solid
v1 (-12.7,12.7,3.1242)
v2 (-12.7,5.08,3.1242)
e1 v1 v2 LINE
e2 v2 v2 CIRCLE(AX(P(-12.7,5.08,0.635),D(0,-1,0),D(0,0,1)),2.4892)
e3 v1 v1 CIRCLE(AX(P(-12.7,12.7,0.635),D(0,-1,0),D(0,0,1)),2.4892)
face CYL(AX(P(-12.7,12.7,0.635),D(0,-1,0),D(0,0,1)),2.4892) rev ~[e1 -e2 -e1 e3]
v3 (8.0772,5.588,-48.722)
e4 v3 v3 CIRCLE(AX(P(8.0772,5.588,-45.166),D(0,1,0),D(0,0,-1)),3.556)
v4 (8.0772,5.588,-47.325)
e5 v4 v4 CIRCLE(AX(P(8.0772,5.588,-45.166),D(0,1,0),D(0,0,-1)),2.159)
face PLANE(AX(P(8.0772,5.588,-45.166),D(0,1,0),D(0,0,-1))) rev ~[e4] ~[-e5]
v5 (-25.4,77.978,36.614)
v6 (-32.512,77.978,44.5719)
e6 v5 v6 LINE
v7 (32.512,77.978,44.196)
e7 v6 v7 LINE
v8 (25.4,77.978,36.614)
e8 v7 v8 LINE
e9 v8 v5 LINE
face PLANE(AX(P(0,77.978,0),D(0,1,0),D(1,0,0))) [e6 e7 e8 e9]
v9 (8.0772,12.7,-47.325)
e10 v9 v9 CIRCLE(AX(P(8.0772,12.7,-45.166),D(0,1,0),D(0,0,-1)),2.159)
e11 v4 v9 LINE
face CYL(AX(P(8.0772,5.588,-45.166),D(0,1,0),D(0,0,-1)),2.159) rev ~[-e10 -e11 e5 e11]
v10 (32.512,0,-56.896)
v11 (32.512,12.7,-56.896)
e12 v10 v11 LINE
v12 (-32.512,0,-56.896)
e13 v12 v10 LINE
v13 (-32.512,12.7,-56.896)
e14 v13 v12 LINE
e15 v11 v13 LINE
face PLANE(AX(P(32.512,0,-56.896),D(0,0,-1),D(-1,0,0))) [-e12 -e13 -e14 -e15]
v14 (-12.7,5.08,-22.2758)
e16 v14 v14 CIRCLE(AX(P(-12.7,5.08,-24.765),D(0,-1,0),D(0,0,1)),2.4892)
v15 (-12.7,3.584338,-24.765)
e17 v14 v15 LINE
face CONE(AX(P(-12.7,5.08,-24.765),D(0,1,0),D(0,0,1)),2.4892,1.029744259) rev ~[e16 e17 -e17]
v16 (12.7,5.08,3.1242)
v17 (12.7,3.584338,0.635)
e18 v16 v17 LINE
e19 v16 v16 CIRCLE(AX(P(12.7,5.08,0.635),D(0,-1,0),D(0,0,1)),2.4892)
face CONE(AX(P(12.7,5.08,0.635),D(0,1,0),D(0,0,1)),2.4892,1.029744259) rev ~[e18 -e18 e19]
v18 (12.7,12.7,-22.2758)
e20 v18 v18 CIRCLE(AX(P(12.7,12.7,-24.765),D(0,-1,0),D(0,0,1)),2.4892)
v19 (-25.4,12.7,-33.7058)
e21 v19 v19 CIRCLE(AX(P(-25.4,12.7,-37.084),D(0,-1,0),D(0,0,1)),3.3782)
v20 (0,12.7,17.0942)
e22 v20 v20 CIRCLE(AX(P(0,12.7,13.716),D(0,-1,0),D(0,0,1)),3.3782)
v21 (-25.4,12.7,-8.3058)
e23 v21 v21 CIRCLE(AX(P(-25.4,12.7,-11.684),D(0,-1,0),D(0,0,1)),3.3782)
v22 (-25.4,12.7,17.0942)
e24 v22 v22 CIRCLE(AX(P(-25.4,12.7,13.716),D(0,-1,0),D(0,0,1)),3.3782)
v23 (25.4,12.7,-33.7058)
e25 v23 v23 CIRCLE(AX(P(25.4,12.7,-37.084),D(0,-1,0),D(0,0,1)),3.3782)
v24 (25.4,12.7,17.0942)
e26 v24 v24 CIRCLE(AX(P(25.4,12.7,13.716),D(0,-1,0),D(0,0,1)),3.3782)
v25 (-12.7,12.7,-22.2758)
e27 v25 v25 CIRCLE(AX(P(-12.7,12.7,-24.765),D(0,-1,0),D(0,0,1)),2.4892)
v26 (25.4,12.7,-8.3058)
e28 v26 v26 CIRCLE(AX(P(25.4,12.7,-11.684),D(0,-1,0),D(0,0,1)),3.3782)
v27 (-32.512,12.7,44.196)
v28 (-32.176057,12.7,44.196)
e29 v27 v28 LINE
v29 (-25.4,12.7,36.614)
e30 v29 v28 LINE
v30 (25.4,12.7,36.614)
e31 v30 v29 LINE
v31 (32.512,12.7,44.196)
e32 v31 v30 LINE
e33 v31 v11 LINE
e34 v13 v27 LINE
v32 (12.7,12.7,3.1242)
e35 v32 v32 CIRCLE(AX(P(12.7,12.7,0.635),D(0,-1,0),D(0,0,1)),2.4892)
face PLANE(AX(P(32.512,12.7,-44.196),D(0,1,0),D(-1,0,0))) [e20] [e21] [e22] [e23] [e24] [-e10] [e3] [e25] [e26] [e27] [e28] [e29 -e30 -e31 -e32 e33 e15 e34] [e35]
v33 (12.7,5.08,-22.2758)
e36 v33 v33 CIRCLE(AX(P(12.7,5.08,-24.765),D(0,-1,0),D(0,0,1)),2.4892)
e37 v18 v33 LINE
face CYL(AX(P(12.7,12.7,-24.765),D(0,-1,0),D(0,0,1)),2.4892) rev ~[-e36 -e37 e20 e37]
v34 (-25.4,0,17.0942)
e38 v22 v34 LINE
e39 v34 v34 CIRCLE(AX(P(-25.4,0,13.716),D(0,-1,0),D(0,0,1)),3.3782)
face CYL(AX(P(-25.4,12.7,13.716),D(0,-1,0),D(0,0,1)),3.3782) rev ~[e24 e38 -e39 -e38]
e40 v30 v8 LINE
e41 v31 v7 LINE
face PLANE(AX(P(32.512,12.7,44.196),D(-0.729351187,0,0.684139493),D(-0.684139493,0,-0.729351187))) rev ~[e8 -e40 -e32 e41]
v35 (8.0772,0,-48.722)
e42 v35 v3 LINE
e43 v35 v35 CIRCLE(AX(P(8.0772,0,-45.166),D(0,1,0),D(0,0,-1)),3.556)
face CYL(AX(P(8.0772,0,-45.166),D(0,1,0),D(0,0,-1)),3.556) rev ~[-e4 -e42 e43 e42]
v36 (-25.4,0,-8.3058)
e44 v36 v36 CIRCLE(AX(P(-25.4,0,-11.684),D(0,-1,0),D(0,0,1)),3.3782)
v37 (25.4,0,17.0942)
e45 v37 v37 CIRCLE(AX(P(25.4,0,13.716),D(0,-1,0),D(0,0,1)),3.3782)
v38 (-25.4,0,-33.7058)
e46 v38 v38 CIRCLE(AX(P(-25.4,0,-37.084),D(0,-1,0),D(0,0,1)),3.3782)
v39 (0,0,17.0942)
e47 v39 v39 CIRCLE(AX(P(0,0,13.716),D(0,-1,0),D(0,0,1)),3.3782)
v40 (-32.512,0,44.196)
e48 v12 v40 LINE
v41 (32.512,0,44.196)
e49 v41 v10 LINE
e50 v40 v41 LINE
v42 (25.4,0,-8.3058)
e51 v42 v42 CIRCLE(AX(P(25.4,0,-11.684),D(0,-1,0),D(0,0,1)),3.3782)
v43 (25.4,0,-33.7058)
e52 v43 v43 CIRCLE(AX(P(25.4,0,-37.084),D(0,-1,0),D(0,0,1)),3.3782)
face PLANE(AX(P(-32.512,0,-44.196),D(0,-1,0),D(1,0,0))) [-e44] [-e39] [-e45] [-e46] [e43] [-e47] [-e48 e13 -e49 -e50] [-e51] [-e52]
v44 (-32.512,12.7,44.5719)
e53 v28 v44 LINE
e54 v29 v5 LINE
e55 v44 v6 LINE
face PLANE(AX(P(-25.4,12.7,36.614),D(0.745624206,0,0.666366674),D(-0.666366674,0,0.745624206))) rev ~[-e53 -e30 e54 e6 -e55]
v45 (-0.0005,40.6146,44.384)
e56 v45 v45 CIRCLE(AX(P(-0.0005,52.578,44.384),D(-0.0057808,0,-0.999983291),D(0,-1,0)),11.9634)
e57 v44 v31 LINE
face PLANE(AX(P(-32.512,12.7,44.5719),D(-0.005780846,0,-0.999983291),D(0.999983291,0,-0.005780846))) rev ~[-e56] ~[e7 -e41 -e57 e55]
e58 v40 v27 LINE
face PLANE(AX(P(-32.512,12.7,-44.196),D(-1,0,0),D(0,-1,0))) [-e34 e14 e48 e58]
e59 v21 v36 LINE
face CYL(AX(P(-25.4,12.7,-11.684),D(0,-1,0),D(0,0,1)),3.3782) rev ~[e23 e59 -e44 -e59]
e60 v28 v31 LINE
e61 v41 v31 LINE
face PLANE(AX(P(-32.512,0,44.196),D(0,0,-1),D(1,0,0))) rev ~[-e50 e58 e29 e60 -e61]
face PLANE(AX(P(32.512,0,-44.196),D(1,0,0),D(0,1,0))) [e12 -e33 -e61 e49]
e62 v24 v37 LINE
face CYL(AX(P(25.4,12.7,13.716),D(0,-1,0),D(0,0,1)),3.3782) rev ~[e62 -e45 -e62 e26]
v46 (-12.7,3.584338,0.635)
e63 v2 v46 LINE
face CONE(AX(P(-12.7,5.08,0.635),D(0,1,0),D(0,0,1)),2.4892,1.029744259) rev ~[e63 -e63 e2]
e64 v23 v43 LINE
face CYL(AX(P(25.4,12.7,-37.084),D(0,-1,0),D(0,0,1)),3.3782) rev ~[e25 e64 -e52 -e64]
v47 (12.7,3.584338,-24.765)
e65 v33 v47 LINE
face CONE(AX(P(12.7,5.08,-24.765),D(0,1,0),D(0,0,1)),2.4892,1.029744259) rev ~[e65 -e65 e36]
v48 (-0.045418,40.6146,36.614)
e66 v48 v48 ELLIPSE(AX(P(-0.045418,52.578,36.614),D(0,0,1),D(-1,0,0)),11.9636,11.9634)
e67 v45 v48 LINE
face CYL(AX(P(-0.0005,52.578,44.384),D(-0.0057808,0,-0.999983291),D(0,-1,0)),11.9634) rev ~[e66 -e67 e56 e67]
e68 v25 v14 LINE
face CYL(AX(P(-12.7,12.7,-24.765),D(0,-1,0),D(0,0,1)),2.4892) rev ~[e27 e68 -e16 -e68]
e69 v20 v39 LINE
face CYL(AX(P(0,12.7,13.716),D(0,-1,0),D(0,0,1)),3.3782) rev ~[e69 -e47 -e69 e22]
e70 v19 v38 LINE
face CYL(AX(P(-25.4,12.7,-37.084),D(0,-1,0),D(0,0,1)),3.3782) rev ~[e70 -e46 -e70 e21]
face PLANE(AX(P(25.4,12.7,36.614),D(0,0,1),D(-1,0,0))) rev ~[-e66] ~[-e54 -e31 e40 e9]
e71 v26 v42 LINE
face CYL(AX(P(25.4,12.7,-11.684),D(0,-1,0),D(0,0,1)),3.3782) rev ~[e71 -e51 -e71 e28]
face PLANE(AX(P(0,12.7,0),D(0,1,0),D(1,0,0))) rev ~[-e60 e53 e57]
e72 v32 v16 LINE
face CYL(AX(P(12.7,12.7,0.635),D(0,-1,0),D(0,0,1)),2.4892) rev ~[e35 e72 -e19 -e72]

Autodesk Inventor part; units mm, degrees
ref_plane "YZ Plane" through (0, 0, 0) normal (1, 0, 0) x (0, 1, 0)
ref_plane "XZ Plane" through (0, 0, 0) normal (0, 1, 0) x (-1, 0, 0)
ref_plane "XY Plane" through (0, 0, 0) normal (0, 0, 1) x (1, 0, 0)
sketch "Sketch1" plane through (0, 0, 0) normal (0, 1, 0) x (-1, 0, 0)
  line L0 (-32.512, -44.196) -> (32.512, -44.196)
  line L1 (32.512, -44.196) -> (32.512, 44.196)
  line L2 (32.512, 44.196) -> (-32.512, 44.196)
  line L3 (-32.512, 44.196) -> (-32.512, -44.196)
  line L4 (-32.512, -44.196) -> (32.512, 44.196) construction
  line L5 (32.512, -44.196) -> (-32.512, 44.196) construction
  point P0 (0, 0)
  point P1 (0, 0)
  dimension "d0" = 65.024
  dimension "d1" = 88.392
extrude "Extrusion1" add sketch "Sketch1" along normal blind 12.7
hole "Hole1" at (-25.4, 12.7, -37.084) direction (0, -1, 0) diameter 6.7564 end through all clearance for "Flat Head Machine Screw (82)" size "1/4" standard "Ansi Unified Screw Threads"
hole "Hole3" at (25.4, 12.7, -37.084) direction (0, -1, 0) diameter 6.7564 end through all clearance for "Flat Head Machine Screw (82)" size "1/4" standard "Ansi Unified Screw Threads"
hole "Hole4" at (25.4, 12.7, -11.684) direction (0, -1, 0) diameter 6.7564 end through all clearance for "Flat Head Machine Screw (82)" size "1/4" standard "Ansi Unified Screw Threads"
hole "Hole5" at (25.4, 12.7, 13.716) direction (0, -1, 0) diameter 6.7564 end through all clearance for "Flat Head Machine Screw (82)" size "1/4" standard "Ansi Unified Screw Threads"
hole "Hole6" at (0, 12.7, 13.716) direction (0, -1, 0) diameter 6.7564 end through all clearance for "Flat Head Machine Screw (82)" size "1/4" standard "Ansi Unified Screw Threads"
hole "Hole7" at (-25.4, 12.7, 13.716) direction (0, -1, 0) diameter 6.7564 end through all clearance for "Flat Head Machine Screw (82)" size "1/4" standard "Ansi Unified Screw Threads"
hole "Hole8" at (-25.4, 12.7, -11.684) direction (0, -1, 0) diameter 6.7564 end through all clearance for "Flat Head Machine Screw (82)" size "1/4" standard "Ansi Unified Screw Threads"
sketch "Sketch2" plane through (0, 12.7, 0) normal (0, 1, 0) x (1, 0, 0)
  line L0 (-32.512, -44.5719) -> (32.512, -44.196)
  line L1 (32.512, -44.196) -> (25.4, -36.614)
  line L2 (25.4, -36.614) -> (-25.4, -36.614)
  line L3 (-25.4, -36.614) -> (-32.512, -44.5719)
  line L4 (-32.512, -44.5719) -> (25.4, -36.614) construction
  line L5 (32.512, -44.196) -> (-25.4, -36.614) construction
  point P0 (0, 0)
  point P1 (0.6144, -40.0199)
extrude "Extrusion2" add sketch "Sketch2" along normal blind 65.278
hole "Hole9" at (-0.0005, 52.578, 44.384) direction (-0.0057808, 0, -0.9999833) diameter 23.9268 end through all
sketch "Sketch3" plane through (32.512, 0, -44.196) normal (0, 0, -1) x (-1, 0, 0)
  line L0 (0, 12.7) -> (65.024, 12.7)
  line L1 (65.024, 12.7) -> (65.024, 0)
  line L2 (65.024, 0) -> (0, 0)
  line L3 (0, 0) -> (0, 12.7)
  line L4 (0, 12.7) -> (65.024, 0) construction
  line L5 (65.024, 12.7) -> (0, 0) construction
  point P0 (32.512, 0)
  point P1 (32.512, 6.35)
extrude "Extrusion3" add sketch "Sketch3" along normal blind 12.7
hole "Hole10" at (8.0772, 0, -45.166) direction (0, 1, 0) diameter 4.318 end through all counterbore diameter 7.112 counterbore depth 5.588
hole "Hole13" at (12.7, 12.7, 0.635) direction (0, -1, 0) diameter 4.9784 depth 7.62 tip angle 118 thread size "1/4-20 UNC" class "2B" standard "ANSI Unified Screw Threads"
hole "Hole14" at (-12.7, 12.7, 0.635) direction (0, -1, 0) diameter 4.9784 depth 7.62 tip angle 118 thread size "1/4-20 UNC" class "2B" standard "ANSI Unified Screw Threads"
sketch "Sketch4" plane through (32.512, 12.7, 36.614) normal (1, 0, 0) x (0, 0, -1)
  line L0 (-7.582, -12.7) -> (93.51, -12.7) projected
  line L1 (93.51, 0) -> (93.51, -12.7) projected
  line L2 (0, 0) -> (93.51, 0) projected
  line L3 (0, 0) -> (0, 65.278) projected
  line L4 (-7.582, 65.278) -> (0, 65.278) projected
  line L5 (-7.582, 0) -> (-7.582, 65.278) projected
  line L6 (-18.542, 0) -> (-18.1661, 0) projected
  line L7 (-7.582, -12.7) -> (-7.582, 0) projected
  point P0 (36.614, -12.7)
sketch "Sketch5" plane through (32.512, 12.7, 36.614) normal (1, 0, 0) x (0, 0, -1)
  line L0 (-7.582, -12.7) -> (93.51, -12.7) projected
  line L1 (93.51, 0) -> (93.51, -12.7) projected
  line L2 (0, 0) -> (93.51, 0) projected
  line L3 (0, 0) -> (0, 65.278) projected
  line L4 (-7.582, 65.278) -> (0, 65.278) projected
  line L5 (-7.582, 0) -> (-7.582, 65.278) projected
  line L6 (-18.542, 0) -> (-18.1661, 0) projected
  line L7 (-7.582, -12.7) -> (-7.582, 0) projected
  point P0 (36.614, -12.7)
sketch "Sketch6" plane through (0, 77.978, 0) normal (0, 1, 0) x (1, 0, 0)
  line L0 (-32.512, -44.5719) -> (32.512, -44.196) projected
  line L1 (32.512, -44.196) -> (25.4, -36.614) projected
  line L2 (25.4, -36.614) -> (-25.4, -36.614) construction
  line L3 (-25.4, -36.614) -> (-32.512, -44.5719) projected
  point P0 (0, 0)
sketch "Sketch7" plane through (32.512, 12.7, 36.614) normal (1, 0, 0) x (0, 0, -1)
  line L0 (-7.582, -12.7) -> (93.51, -12.7) projected
  line L1 (93.51, 0) -> (93.51, -12.7) projected
  line L2 (0, 0) -> (93.51, 0) projected
  line L3 (0, 0) -> (0, 65.278) projected
  line L4 (-7.582, 65.278) -> (0, 65.278) projected
  line L5 (-7.582, 0) -> (-7.582, 65.278) construction
  line L6 (-18.542, 0) -> (-18.1661, 0) projected
  line L7 (-7.582, -12.7) -> (-7.582, 0) projected
  point P0 (36.614, -12.7)
sketch "Sketch8" plane through (-32.512, 12.7, 44.5719) normal (0.0057808, 0, 0.9999833) x (0.9999833, 0, -0.0057808)
  circle A0 centre (32.512, 39.878) radius 11.9634 projected
  line L0 (0, 0) -> (65.0251, 0) projected
  line L1 (65.0251, 0) -> (65.0251, 65.278) projected
  line L2 (0, 65.278) -> (65.0251, 65.278) projected
  line L3 (0, 0) -> (0, 65.278) projected
  point P0 (65.024, 0)
  point P1 (32.7691, -12.7)
hole "Hole16" at (12.7, 12.7, -24.765) direction (0, -1, 0) diameter 4.9784 depth 7.62 tip angle 118 thread size "1/4-20 UNC" class "2B" standard "ANSI Unified Screw Threads"
hole "Hole17" at (-12.7, 12.7, -24.765) direction (0, -1, 0) diameter 4.9784 depth 7.62 tip angle 118 thread size "1/4-20 UNC" class "2B" standard "ANSI Unified Screw Threads"
properties part number "DetectionAdapter"
